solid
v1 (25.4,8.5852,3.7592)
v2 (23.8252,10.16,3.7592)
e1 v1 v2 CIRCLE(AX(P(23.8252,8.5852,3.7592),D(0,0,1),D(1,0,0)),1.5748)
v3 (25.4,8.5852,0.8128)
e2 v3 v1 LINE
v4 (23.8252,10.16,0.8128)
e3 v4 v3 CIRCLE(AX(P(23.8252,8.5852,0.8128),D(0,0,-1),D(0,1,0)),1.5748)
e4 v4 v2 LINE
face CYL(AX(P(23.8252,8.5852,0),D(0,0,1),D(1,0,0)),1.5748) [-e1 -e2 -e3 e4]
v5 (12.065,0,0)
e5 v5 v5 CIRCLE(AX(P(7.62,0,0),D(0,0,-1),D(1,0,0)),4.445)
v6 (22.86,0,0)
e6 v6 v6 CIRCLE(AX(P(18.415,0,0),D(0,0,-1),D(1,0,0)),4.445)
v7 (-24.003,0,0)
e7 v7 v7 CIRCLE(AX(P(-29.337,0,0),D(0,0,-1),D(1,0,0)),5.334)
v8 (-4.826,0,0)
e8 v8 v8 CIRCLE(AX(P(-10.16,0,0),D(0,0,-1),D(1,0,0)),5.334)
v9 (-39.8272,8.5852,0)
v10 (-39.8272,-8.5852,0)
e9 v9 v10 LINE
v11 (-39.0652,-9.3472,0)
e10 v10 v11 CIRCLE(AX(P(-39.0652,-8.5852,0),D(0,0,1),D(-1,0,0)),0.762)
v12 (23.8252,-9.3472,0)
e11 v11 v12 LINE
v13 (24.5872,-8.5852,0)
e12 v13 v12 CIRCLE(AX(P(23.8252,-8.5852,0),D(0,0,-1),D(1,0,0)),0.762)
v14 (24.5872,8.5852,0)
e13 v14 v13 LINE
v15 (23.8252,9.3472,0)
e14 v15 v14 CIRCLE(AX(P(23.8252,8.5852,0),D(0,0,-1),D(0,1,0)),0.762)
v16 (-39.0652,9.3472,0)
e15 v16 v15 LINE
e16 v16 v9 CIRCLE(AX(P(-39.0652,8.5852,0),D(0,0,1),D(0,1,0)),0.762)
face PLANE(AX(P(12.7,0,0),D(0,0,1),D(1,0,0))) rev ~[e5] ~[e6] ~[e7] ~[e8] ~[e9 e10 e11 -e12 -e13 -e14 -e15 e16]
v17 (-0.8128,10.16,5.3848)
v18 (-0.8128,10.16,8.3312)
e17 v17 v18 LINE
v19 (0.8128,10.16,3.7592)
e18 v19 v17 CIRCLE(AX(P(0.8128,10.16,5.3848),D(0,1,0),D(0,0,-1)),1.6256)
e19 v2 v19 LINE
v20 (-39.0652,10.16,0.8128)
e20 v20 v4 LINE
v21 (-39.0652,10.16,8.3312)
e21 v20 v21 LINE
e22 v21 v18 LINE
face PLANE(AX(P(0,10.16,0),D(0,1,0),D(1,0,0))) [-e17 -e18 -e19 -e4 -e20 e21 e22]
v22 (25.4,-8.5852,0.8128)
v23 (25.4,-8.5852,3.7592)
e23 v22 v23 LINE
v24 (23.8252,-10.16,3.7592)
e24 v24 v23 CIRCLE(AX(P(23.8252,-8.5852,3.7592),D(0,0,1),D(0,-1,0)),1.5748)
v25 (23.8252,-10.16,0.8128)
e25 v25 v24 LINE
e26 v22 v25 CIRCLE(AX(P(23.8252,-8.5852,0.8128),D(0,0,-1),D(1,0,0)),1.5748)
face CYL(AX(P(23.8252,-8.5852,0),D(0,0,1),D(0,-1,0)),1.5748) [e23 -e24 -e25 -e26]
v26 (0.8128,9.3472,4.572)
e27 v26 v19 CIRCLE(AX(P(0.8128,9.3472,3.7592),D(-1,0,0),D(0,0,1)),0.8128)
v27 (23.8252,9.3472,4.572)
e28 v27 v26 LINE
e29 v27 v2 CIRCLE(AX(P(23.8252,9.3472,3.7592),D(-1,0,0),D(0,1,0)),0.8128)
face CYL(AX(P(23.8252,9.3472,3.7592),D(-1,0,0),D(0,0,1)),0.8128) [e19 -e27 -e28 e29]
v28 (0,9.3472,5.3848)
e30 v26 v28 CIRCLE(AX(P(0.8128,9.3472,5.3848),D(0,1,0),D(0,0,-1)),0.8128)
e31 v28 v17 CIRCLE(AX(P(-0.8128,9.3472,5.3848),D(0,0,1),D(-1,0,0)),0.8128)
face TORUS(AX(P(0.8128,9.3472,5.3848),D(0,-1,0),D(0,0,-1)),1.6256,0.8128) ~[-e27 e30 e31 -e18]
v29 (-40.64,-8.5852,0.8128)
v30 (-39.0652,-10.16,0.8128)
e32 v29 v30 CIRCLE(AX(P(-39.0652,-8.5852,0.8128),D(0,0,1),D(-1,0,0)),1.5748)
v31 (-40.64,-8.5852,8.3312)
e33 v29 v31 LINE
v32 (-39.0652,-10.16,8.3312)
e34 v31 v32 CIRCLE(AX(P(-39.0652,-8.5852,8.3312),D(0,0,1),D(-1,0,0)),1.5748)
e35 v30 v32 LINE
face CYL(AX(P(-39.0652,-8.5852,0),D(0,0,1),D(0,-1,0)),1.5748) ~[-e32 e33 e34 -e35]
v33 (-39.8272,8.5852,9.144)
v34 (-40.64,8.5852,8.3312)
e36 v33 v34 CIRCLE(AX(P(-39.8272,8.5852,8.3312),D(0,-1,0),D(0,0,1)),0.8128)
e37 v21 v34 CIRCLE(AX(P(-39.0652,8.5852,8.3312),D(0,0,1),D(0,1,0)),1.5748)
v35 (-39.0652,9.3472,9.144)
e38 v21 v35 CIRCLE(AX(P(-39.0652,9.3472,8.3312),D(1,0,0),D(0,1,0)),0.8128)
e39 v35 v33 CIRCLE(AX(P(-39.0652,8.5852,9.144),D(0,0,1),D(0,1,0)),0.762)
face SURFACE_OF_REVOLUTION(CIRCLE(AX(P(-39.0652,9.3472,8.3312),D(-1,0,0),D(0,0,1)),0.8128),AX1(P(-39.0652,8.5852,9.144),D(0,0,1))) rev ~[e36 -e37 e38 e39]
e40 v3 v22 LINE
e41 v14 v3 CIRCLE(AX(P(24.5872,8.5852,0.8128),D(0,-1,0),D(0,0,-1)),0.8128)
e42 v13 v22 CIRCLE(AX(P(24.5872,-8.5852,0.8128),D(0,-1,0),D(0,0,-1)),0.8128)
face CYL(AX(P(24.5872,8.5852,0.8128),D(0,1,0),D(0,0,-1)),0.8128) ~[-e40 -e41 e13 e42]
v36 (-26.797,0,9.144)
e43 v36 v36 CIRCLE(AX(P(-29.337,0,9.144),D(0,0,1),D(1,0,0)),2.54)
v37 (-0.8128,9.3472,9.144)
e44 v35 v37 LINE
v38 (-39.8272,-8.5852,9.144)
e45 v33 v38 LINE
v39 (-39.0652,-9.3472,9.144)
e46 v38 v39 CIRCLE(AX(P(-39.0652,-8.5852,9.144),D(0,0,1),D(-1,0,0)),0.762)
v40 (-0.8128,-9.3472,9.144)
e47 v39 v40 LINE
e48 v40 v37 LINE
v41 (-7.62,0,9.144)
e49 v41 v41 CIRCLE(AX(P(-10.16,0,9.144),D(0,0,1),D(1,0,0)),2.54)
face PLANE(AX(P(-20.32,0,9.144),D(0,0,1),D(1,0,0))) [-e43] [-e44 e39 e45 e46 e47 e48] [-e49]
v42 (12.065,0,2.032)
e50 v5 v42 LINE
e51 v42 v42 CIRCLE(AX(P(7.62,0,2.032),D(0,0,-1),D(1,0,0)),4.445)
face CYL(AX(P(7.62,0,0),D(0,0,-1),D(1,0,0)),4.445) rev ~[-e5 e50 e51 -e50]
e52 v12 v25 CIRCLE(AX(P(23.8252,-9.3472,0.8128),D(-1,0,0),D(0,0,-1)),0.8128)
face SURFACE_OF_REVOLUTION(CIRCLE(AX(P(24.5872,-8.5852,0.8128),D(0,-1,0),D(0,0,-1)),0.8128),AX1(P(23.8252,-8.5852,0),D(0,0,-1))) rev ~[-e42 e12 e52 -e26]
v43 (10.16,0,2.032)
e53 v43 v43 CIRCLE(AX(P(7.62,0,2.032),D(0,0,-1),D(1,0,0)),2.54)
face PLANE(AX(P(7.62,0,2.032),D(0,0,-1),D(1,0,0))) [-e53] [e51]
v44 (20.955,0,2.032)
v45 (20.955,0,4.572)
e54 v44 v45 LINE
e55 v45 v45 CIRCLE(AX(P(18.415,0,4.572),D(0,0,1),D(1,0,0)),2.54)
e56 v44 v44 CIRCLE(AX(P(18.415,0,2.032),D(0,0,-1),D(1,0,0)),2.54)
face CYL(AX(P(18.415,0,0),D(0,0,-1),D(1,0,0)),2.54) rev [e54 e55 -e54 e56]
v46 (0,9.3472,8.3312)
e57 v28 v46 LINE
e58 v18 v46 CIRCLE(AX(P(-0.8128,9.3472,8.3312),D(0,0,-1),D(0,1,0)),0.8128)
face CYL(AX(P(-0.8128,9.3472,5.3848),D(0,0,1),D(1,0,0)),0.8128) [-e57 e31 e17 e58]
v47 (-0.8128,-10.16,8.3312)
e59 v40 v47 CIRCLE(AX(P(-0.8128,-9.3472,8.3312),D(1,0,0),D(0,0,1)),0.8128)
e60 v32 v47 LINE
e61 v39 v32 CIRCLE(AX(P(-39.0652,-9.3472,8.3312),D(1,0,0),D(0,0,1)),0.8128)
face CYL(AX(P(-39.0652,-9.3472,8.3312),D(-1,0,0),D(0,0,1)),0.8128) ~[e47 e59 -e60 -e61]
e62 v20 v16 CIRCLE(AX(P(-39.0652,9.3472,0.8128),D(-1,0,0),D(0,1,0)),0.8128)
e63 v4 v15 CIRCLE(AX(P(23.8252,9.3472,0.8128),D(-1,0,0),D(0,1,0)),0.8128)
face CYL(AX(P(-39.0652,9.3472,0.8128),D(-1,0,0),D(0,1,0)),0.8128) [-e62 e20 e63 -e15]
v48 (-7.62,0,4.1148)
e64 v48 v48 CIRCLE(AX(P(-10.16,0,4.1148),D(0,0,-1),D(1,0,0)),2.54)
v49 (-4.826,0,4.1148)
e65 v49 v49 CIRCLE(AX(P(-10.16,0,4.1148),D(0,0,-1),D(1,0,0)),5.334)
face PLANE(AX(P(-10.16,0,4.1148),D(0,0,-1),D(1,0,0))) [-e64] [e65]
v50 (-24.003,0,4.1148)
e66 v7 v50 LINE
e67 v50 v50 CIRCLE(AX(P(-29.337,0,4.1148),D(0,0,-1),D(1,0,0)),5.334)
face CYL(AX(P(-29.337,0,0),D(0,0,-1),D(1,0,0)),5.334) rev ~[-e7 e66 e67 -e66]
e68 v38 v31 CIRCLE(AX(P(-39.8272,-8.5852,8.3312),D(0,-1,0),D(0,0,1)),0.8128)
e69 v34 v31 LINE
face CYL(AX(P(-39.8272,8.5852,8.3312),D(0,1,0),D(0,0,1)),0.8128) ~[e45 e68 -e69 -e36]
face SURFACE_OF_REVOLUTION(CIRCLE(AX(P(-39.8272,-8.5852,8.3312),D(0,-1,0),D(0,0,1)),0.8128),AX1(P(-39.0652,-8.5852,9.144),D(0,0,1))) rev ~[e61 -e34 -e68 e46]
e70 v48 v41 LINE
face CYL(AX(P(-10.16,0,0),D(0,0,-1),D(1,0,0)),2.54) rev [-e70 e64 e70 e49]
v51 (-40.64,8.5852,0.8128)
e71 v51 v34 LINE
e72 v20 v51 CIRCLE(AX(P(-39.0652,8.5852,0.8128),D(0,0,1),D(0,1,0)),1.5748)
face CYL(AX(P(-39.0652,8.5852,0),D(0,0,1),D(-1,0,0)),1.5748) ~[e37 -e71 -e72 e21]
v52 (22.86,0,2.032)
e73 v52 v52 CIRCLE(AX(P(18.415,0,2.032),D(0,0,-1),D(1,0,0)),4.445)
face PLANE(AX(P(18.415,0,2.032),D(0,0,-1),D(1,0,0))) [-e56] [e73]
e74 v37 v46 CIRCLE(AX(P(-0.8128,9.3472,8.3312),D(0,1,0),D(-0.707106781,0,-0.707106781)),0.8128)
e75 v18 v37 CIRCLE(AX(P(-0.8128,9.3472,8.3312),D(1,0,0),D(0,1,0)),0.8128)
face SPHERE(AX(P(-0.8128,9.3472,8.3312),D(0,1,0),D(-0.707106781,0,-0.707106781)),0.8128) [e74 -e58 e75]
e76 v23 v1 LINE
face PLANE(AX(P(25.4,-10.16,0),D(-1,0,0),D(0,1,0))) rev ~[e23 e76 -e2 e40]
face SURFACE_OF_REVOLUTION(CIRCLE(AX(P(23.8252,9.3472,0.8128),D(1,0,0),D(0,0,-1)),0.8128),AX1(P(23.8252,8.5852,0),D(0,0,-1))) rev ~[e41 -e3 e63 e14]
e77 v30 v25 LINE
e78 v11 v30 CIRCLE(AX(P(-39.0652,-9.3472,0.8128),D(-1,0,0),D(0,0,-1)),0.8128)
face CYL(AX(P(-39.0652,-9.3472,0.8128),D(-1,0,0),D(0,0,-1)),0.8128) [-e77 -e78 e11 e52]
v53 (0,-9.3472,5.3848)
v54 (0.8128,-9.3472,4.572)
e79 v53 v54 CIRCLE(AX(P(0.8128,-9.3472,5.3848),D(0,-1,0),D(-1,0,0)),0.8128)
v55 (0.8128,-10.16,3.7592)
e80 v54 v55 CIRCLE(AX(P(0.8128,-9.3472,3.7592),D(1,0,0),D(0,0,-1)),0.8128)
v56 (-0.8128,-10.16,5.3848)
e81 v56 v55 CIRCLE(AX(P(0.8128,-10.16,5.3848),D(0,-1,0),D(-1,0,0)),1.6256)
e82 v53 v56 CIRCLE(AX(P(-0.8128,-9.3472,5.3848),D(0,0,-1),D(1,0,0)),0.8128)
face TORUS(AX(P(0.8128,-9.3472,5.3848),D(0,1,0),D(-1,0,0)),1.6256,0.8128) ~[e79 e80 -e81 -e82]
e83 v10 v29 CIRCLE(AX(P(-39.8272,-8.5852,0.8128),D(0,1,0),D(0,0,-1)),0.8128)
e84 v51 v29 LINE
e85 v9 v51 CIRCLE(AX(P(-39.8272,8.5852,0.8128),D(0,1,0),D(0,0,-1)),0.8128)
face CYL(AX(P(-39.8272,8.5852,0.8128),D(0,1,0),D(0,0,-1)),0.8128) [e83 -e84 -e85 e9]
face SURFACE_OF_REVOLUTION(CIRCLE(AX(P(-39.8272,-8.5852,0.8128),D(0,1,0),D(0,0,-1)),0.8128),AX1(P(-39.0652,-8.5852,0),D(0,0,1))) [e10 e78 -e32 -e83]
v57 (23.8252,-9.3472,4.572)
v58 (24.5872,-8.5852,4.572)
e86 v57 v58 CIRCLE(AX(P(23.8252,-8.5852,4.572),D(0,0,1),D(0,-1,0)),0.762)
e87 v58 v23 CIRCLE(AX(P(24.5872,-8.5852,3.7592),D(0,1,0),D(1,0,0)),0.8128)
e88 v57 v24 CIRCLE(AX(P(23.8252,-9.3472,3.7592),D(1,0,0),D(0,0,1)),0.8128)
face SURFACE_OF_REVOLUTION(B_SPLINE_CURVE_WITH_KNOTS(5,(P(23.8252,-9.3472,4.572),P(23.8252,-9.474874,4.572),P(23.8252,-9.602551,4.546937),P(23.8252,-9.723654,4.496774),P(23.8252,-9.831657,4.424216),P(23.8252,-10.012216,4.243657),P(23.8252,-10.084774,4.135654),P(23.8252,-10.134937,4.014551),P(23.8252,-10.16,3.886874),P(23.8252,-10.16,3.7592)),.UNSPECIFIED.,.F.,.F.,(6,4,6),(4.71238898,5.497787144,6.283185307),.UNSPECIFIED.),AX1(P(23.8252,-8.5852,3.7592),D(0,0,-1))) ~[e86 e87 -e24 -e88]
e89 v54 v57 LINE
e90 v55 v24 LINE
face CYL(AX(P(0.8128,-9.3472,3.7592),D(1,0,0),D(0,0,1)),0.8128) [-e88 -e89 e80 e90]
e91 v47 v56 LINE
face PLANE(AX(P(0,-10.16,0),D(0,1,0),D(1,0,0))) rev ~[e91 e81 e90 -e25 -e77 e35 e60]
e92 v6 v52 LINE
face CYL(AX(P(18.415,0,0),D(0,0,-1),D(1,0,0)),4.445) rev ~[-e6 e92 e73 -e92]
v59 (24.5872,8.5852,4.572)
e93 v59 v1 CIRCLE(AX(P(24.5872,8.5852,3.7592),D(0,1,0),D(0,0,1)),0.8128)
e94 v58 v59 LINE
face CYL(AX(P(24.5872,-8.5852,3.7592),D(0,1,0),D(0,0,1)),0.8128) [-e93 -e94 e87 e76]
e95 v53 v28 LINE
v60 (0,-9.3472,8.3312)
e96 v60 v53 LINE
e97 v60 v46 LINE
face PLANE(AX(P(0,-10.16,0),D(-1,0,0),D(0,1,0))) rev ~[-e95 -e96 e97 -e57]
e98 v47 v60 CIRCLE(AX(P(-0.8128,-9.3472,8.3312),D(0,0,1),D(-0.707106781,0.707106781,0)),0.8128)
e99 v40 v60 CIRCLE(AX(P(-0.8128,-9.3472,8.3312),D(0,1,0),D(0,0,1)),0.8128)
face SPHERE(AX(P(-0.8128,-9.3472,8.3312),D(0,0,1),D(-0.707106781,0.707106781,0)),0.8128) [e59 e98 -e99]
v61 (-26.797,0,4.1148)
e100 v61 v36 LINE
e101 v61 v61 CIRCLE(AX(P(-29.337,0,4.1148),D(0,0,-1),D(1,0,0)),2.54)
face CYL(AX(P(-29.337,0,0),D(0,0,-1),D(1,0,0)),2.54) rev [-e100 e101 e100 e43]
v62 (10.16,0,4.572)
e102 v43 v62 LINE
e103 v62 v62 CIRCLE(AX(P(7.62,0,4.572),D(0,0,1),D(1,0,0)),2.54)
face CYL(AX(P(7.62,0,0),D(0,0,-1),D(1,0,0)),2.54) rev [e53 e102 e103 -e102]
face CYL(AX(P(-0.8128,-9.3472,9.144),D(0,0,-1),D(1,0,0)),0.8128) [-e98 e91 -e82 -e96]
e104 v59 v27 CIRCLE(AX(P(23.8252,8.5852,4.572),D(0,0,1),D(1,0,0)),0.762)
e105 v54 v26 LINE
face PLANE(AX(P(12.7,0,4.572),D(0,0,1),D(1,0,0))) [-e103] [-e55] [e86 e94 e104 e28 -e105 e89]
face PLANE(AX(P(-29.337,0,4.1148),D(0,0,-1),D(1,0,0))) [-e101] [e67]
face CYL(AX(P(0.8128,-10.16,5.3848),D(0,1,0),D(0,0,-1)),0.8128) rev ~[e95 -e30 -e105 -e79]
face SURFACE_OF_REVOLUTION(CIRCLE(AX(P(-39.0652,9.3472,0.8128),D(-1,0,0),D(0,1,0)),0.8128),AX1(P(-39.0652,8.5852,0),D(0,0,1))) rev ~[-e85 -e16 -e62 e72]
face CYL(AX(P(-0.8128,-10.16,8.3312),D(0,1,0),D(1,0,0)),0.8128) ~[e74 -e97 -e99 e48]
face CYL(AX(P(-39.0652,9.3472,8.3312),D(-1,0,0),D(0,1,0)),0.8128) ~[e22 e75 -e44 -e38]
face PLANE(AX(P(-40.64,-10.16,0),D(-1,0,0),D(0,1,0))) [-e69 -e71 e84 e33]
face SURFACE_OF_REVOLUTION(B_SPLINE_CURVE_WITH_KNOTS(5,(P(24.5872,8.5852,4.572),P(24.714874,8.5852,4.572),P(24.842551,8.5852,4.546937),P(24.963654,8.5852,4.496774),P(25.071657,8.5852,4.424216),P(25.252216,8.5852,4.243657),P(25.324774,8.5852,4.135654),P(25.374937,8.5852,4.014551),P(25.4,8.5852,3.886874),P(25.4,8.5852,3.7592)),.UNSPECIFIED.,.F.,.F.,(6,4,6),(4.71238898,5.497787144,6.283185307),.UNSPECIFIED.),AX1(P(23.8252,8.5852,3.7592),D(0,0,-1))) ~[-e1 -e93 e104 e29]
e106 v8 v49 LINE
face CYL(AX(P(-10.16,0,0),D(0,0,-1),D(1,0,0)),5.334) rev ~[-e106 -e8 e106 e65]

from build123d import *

# Parameters (mm, degrees)
F0_W          = 40.64
F0_H          = 20.32
F0_R          = 2.54
F1_DEPTH      = 9.144
F2_W          = 25.4
F2_H          = 20.32
F2_R          = 2.54
F3_DEPTH      = 4.572
F4_R          = 5.334
F4_R_2        = 2.54
F5_DEPTH      = 4.1148
F6_R          = 4.445
F6_R_2        = 2.54
F7_DEPTH      = 2.032
F8_R          = 1.5748
F9_F1_R       = 0.8128
F9_F2_R       = 0.8128
F10_T1_DEPTH  = 38.2524
F10_T3_DEPTH  = 62.8904
F10_T5_DEPTH  = 17.1704
F10_S9_W      = 0.8128
F10_S9_H      = 0.8128
F10_T10_DEPTH = 0.8128
F10_S15_W     = 0.8128
F10_S15_H     = 0.8128
F10_T16_DEPTH = 0.8128
F10_T20_ANGLE = 90
F10_T22_ANGLE = 90
F10_T24_ANGLE = 90
F10_T26_ANGLE = 90
F10_T28_ANGLE = 90
F10_T30_ANGLE = 90


# Not quite as in the source:
# - a fillet or chamfer that OpenCascade refuses, or shapes differently, is made with other operations: its cross-section is extruded or revolved along the edge and cut away or added


with BuildPart() as f1:
    # F0 (on Top) → F1 (new body)
    with BuildSketch(Plane.XY):
        with Locations((-20.32, 0)):
            Rectangle(F0_W, F0_H)
        with Locations((-29.337, 0)):
            Circle(F0_R, mode=Mode.SUBTRACT)
        with Locations((-10.16, 0)):
            Circle(F0_R, mode=Mode.SUBTRACT)
    extrude(amount=F1_DEPTH)

    # F2 (on Top) → F3 (join)
    with BuildSketch(Plane.XY):
        with Locations((12.7, 0)):
            Rectangle(F2_W, F2_H)
        with Locations((7.62, 0)):
            Circle(F2_R, mode=Mode.SUBTRACT)
        with Locations((18.415, 0)):
            Circle(F2_R, mode=Mode.SUBTRACT)
    extrude(amount=F3_DEPTH)

    # F4 (on face) → F5 (cut)
    with BuildSketch(Plane(origin=(0, 0, 0), x_dir=(1, 0, 0), z_dir=(0, 0, -1))):
        with Locations((-29.337, 0)):
            Circle(F4_R)
        with Locations((-29.337, 0)):
            Circle(F4_R_2, mode=Mode.SUBTRACT)
        with Locations((-10.16, 0)):
            Circle(F4_R)
        with Locations((-10.16, 0)):
            Circle(F4_R_2, mode=Mode.SUBTRACT)
    extrude(amount=-F5_DEPTH, mode=Mode.SUBTRACT)

    # F6 (on face) → F7 (cut)
    with BuildSketch(Plane(origin=(0, 0, 0), x_dir=(1, 0, 0), z_dir=(0, 0, -1))):
        with Locations((7.62, 0)):
            Circle(F6_R)
        with Locations((7.62, 0)):
            Circle(F6_R_2, mode=Mode.SUBTRACT)
        with Locations((18.415, 0)):
            Circle(F6_R)
        with Locations((18.415, 0)):
            Circle(F6_R_2, mode=Mode.SUBTRACT)
    extrude(amount=-F7_DEPTH, mode=Mode.SUBTRACT)

    # F8
    f8_edges = [f1.edges().sort_by_distance(p)[0] for p in [
        (-40.64, 10.16, 4.572),
        (-40.64, -10.16, 4.572),
        (25.4, 10.16, 2.286),
        (25.4, -10.16, 2.286),
    ]]
    fillet(f8_edges, radius=F8_R)

    # F9: fillet of radius 0.8128 on 3 edges, made by hand

    # F9_f1
    f9_f1_edges = [f1.edges().sort_by_distance(p)[0] for p in [
        (0, 0, 4.572),
    ]]
    fillet(f9_f1_edges, radius=F9_F1_R)

    # F9_f2
    f9_f2_edges = [f1.edges().sort_by_distance(p)[0] for p in [
        (0, 10.16, 7.2644),
        (0, 0, 9.144),
        (0.2380636083, 10.16, 4.8100636083),
    ]]
    fillet(f9_f2_edges, radius=F9_F2_R)

    # F10: fillet of radius 0.8128 on 13 edges, made by hand

    # F10_s2 → F10_t1 (cut)
    with BuildSketch(Plane.YZ.offset(-39.0652)):
        with BuildLine():
            ThreePointArc((-9.3472, 9.144), (-9.9219363917, 8.9059363917), (-10.16, 8.3312))
            Line((-10.16, 8.3312), (-10.16, 9.144))
            Line((-10.16, 9.144), (-9.3472, 9.144))
        make_face()
        with BuildLine():
            ThreePointArc((10.16, 8.3312), (9.9219363917, 8.9059363917), (9.3472, 9.144))
            Line((9.3472, 9.144), (10.16, 9.144))
            Line((10.16, 9.144), (10.16, 8.3312))
        make_face()
    extrude(amount=F10_T1_DEPTH, mode=Mode.SUBTRACT)

    # F10_s4 → F10_t3 (cut)
    with BuildSketch(Plane.YZ.offset(-39.0652)):
        with BuildLine():
            ThreePointArc((10.16, 0.8128), (9.9219363917, 0.2380636083), (9.3472, 0))
            Line((9.3472, 0), (10.16, 0))
            Line((10.16, 0), (10.16, 0.8128))
        make_face()
        with BuildLine():
            ThreePointArc((-9.3472, 0), (-9.9219363917, 0.2380636083), (-10.16, 0.8128))
            Line((-10.16, 0.8128), (-10.16, 0))
            Line((-10.16, 0), (-9.3472, 0))
        make_face()
    extrude(amount=F10_T3_DEPTH, mode=Mode.SUBTRACT)

    # F10_s6 → F10_t5 (cut)
    with BuildSketch(Plane.XZ.offset(-8.5852)):
        with BuildLine():
            ThreePointArc((-39.8272, 9.144), (-40.4019363917, 8.9059363917), (-40.64, 8.3312))
            Line((-40.64, 8.3312), (-40.64, 9.144))
            Line((-40.64, 9.144), (-39.8272, 9.144))
        make_face()
        with BuildLine():
            ThreePointArc((-39.8272, 0), (-40.4019363917, 0.2380636083), (-40.64, 0.8128))
            Line((-40.64, 0.8128), (-40.64, 0))
            Line((-40.64, 0), (-39.8272, 0))
        make_face()
        with BuildLine():
            ThreePointArc((24.5872, 0), (25.1619363917, 0.2380636083), (25.4, 0.8128))
            Line((25.4, 0.8128), (25.4, 0))
            Line((25.4, 0), (24.5872, 0))
        make_face()
    extrude(amount=F10_T5_DEPTH, mode=Mode.SUBTRACT)


with BuildPart() as f10_tool8:
    # F10_s9 → F10_t10 (new body)
    with BuildSketch(Plane.XZ.offset(-9.3472)):
        with Locations((-0.4064, 8.7376)):
            Rectangle(F10_S9_W, F10_S9_H)
    extrude(amount=-F10_T10_DEPTH)

    # F10_s11 → F10_t12 (revolve, cut)
    with BuildSketch(Plane(origin=(-0.8128, 9.3472, 8.3312), x_dir=(-0.7071067812, 0, -0.7071067812), z_dir=(0.7071067812, 0, -0.7071067812))):
        with BuildLine():
            ThreePointArc((0, -0.8128), (0.8128, 0), (0, 0.8128))
            Line((0, 0.8128), (0, -0.8128))
        make_face()
    revolve(axis=Axis((-0.8128, 9.3472, 8.3312), (0, 1, 0)), mode=Mode.SUBTRACT)


with BuildPart() as f1_1:
    add(f1.part)

    # F10_t7: cut F10_tool8
    add(f10_tool8.part, mode=Mode.SUBTRACT)


with BuildPart() as f10_tool14:
    # F10_s15 → F10_t16 (new body)
    with BuildSketch(Plane.XY.offset(8.3312)):
        with Locations((-0.4064, -9.7536)):
            Rectangle(F10_S15_W, F10_S15_H)
    extrude(amount=F10_T16_DEPTH)

    # F10_s17 → F10_t18 (revolve, cut)
    with BuildSketch(Plane(origin=(-0.8128, -9.3472, 8.3312), x_dir=(-0.7071067812, 0.7071067812, 0), z_dir=(0.7071067812, 0.7071067812, 0))):
        with BuildLine():
            ThreePointArc((0, -0.8128), (0.8128, 0), (0, 0.8128))
            Line((0, 0.8128), (0, -0.8128))
        make_face()
    revolve(axis=Axis((-0.8128, -9.3472, 8.3312), (0, 0, 1)), mode=Mode.SUBTRACT)


with BuildPart() as f1_2:
    add(f1_1.part)

    # F10_t13: cut F10_tool14
    add(f10_tool14.part, mode=Mode.SUBTRACT)

    # F10_s19 → F10_t20 (revolve, cut)
    with BuildSketch(Plane.YZ.offset(-39.0652)):
        with BuildLine():
            ThreePointArc((9.3472, 9.144), (9.9219363917, 8.9059363917), (10.16, 8.3312))
            Line((10.16, 8.3312), (10.16, 9.144))
            Line((10.16, 9.144), (9.3472, 9.144))
        make_face()
    revolve(axis=Axis((-39.0652, 8.5852, 9.144), (0, 0, 1)), revolution_arc=F10_T20_ANGLE, mode=Mode.SUBTRACT)

    # F10_s21 → F10_t22 (revolve, cut)
    with BuildSketch(Plane.XZ.offset(8.5852)):
        with BuildLine():
            ThreePointArc((-39.8272, 9.144), (-40.4019363917, 8.9059363917), (-40.64, 8.3312))
            Line((-40.64, 8.3312), (-40.64, 9.144))
            Line((-40.64, 9.144), (-39.8272, 9.144))
        make_face()
    revolve(axis=Axis((-39.0652, -8.5852, 9.144), (0, 0, 1)), revolution_arc=F10_T22_ANGLE, mode=Mode.SUBTRACT)

    # F10_s23 → F10_t24 (revolve, cut)
    with BuildSketch(Plane.YZ.offset(-39.0652)):
        with BuildLine():
            ThreePointArc((10.16, 0.8128), (9.9219363917, 0.2380636083), (9.3472, 0))
            Line((9.3472, 0), (10.16, 0))
            Line((10.16, 0), (10.16, 0.8128))
        make_face()
    revolve(axis=Axis((-39.0652, 8.5852, 0), (0, 0, 1)), revolution_arc=F10_T24_ANGLE, mode=Mode.SUBTRACT)

    # F10_s25 → F10_t26 (revolve, cut)
    with BuildSketch(Plane.XZ.offset(8.5852)):
        with BuildLine():
            ThreePointArc((-39.8272, 0), (-40.4019363917, 0.2380636083), (-40.64, 0.8128))
            Line((-40.64, 0.8128), (-40.64, 0))
            Line((-40.64, 0), (-39.8272, 0))
        make_face()
    revolve(axis=Axis((-39.0652, -8.5852, 0), (0, 0, 1)), revolution_arc=F10_T26_ANGLE, mode=Mode.SUBTRACT)

    # F10_s27 → F10_t28 (revolve, cut)
    with BuildSketch(Plane.YZ.offset(23.8252)):
        with BuildLine():
            ThreePointArc((9.3472, 0), (9.9219363917, 0.2380636083), (10.16, 0.8128))
            Line((10.16, 0.8128), (10.16, 0))
            Line((10.16, 0), (9.3472, 0))
        make_face()
    revolve(axis=Axis((23.8252, 8.5852, 0), (0, 0, -1)), revolution_arc=F10_T28_ANGLE, mode=Mode.SUBTRACT)

    # F10_s29 → F10_t30 (revolve, cut)
    with BuildSketch(Plane.XZ.offset(8.5852)):
        with BuildLine():
            ThreePointArc((24.5872, 0), (25.1619363917, 0.2380636083), (25.4, 0.8128))
            Line((25.4, 0.8128), (25.4, 0))
            Line((25.4, 0), (24.5872, 0))
        make_face()
    revolve(axis=Axis((23.8252, -8.5852, 0), (0, 0, -1)), revolution_arc=F10_T30_ANGLE, mode=Mode.SUBTRACT)


solid = f1_2.part
